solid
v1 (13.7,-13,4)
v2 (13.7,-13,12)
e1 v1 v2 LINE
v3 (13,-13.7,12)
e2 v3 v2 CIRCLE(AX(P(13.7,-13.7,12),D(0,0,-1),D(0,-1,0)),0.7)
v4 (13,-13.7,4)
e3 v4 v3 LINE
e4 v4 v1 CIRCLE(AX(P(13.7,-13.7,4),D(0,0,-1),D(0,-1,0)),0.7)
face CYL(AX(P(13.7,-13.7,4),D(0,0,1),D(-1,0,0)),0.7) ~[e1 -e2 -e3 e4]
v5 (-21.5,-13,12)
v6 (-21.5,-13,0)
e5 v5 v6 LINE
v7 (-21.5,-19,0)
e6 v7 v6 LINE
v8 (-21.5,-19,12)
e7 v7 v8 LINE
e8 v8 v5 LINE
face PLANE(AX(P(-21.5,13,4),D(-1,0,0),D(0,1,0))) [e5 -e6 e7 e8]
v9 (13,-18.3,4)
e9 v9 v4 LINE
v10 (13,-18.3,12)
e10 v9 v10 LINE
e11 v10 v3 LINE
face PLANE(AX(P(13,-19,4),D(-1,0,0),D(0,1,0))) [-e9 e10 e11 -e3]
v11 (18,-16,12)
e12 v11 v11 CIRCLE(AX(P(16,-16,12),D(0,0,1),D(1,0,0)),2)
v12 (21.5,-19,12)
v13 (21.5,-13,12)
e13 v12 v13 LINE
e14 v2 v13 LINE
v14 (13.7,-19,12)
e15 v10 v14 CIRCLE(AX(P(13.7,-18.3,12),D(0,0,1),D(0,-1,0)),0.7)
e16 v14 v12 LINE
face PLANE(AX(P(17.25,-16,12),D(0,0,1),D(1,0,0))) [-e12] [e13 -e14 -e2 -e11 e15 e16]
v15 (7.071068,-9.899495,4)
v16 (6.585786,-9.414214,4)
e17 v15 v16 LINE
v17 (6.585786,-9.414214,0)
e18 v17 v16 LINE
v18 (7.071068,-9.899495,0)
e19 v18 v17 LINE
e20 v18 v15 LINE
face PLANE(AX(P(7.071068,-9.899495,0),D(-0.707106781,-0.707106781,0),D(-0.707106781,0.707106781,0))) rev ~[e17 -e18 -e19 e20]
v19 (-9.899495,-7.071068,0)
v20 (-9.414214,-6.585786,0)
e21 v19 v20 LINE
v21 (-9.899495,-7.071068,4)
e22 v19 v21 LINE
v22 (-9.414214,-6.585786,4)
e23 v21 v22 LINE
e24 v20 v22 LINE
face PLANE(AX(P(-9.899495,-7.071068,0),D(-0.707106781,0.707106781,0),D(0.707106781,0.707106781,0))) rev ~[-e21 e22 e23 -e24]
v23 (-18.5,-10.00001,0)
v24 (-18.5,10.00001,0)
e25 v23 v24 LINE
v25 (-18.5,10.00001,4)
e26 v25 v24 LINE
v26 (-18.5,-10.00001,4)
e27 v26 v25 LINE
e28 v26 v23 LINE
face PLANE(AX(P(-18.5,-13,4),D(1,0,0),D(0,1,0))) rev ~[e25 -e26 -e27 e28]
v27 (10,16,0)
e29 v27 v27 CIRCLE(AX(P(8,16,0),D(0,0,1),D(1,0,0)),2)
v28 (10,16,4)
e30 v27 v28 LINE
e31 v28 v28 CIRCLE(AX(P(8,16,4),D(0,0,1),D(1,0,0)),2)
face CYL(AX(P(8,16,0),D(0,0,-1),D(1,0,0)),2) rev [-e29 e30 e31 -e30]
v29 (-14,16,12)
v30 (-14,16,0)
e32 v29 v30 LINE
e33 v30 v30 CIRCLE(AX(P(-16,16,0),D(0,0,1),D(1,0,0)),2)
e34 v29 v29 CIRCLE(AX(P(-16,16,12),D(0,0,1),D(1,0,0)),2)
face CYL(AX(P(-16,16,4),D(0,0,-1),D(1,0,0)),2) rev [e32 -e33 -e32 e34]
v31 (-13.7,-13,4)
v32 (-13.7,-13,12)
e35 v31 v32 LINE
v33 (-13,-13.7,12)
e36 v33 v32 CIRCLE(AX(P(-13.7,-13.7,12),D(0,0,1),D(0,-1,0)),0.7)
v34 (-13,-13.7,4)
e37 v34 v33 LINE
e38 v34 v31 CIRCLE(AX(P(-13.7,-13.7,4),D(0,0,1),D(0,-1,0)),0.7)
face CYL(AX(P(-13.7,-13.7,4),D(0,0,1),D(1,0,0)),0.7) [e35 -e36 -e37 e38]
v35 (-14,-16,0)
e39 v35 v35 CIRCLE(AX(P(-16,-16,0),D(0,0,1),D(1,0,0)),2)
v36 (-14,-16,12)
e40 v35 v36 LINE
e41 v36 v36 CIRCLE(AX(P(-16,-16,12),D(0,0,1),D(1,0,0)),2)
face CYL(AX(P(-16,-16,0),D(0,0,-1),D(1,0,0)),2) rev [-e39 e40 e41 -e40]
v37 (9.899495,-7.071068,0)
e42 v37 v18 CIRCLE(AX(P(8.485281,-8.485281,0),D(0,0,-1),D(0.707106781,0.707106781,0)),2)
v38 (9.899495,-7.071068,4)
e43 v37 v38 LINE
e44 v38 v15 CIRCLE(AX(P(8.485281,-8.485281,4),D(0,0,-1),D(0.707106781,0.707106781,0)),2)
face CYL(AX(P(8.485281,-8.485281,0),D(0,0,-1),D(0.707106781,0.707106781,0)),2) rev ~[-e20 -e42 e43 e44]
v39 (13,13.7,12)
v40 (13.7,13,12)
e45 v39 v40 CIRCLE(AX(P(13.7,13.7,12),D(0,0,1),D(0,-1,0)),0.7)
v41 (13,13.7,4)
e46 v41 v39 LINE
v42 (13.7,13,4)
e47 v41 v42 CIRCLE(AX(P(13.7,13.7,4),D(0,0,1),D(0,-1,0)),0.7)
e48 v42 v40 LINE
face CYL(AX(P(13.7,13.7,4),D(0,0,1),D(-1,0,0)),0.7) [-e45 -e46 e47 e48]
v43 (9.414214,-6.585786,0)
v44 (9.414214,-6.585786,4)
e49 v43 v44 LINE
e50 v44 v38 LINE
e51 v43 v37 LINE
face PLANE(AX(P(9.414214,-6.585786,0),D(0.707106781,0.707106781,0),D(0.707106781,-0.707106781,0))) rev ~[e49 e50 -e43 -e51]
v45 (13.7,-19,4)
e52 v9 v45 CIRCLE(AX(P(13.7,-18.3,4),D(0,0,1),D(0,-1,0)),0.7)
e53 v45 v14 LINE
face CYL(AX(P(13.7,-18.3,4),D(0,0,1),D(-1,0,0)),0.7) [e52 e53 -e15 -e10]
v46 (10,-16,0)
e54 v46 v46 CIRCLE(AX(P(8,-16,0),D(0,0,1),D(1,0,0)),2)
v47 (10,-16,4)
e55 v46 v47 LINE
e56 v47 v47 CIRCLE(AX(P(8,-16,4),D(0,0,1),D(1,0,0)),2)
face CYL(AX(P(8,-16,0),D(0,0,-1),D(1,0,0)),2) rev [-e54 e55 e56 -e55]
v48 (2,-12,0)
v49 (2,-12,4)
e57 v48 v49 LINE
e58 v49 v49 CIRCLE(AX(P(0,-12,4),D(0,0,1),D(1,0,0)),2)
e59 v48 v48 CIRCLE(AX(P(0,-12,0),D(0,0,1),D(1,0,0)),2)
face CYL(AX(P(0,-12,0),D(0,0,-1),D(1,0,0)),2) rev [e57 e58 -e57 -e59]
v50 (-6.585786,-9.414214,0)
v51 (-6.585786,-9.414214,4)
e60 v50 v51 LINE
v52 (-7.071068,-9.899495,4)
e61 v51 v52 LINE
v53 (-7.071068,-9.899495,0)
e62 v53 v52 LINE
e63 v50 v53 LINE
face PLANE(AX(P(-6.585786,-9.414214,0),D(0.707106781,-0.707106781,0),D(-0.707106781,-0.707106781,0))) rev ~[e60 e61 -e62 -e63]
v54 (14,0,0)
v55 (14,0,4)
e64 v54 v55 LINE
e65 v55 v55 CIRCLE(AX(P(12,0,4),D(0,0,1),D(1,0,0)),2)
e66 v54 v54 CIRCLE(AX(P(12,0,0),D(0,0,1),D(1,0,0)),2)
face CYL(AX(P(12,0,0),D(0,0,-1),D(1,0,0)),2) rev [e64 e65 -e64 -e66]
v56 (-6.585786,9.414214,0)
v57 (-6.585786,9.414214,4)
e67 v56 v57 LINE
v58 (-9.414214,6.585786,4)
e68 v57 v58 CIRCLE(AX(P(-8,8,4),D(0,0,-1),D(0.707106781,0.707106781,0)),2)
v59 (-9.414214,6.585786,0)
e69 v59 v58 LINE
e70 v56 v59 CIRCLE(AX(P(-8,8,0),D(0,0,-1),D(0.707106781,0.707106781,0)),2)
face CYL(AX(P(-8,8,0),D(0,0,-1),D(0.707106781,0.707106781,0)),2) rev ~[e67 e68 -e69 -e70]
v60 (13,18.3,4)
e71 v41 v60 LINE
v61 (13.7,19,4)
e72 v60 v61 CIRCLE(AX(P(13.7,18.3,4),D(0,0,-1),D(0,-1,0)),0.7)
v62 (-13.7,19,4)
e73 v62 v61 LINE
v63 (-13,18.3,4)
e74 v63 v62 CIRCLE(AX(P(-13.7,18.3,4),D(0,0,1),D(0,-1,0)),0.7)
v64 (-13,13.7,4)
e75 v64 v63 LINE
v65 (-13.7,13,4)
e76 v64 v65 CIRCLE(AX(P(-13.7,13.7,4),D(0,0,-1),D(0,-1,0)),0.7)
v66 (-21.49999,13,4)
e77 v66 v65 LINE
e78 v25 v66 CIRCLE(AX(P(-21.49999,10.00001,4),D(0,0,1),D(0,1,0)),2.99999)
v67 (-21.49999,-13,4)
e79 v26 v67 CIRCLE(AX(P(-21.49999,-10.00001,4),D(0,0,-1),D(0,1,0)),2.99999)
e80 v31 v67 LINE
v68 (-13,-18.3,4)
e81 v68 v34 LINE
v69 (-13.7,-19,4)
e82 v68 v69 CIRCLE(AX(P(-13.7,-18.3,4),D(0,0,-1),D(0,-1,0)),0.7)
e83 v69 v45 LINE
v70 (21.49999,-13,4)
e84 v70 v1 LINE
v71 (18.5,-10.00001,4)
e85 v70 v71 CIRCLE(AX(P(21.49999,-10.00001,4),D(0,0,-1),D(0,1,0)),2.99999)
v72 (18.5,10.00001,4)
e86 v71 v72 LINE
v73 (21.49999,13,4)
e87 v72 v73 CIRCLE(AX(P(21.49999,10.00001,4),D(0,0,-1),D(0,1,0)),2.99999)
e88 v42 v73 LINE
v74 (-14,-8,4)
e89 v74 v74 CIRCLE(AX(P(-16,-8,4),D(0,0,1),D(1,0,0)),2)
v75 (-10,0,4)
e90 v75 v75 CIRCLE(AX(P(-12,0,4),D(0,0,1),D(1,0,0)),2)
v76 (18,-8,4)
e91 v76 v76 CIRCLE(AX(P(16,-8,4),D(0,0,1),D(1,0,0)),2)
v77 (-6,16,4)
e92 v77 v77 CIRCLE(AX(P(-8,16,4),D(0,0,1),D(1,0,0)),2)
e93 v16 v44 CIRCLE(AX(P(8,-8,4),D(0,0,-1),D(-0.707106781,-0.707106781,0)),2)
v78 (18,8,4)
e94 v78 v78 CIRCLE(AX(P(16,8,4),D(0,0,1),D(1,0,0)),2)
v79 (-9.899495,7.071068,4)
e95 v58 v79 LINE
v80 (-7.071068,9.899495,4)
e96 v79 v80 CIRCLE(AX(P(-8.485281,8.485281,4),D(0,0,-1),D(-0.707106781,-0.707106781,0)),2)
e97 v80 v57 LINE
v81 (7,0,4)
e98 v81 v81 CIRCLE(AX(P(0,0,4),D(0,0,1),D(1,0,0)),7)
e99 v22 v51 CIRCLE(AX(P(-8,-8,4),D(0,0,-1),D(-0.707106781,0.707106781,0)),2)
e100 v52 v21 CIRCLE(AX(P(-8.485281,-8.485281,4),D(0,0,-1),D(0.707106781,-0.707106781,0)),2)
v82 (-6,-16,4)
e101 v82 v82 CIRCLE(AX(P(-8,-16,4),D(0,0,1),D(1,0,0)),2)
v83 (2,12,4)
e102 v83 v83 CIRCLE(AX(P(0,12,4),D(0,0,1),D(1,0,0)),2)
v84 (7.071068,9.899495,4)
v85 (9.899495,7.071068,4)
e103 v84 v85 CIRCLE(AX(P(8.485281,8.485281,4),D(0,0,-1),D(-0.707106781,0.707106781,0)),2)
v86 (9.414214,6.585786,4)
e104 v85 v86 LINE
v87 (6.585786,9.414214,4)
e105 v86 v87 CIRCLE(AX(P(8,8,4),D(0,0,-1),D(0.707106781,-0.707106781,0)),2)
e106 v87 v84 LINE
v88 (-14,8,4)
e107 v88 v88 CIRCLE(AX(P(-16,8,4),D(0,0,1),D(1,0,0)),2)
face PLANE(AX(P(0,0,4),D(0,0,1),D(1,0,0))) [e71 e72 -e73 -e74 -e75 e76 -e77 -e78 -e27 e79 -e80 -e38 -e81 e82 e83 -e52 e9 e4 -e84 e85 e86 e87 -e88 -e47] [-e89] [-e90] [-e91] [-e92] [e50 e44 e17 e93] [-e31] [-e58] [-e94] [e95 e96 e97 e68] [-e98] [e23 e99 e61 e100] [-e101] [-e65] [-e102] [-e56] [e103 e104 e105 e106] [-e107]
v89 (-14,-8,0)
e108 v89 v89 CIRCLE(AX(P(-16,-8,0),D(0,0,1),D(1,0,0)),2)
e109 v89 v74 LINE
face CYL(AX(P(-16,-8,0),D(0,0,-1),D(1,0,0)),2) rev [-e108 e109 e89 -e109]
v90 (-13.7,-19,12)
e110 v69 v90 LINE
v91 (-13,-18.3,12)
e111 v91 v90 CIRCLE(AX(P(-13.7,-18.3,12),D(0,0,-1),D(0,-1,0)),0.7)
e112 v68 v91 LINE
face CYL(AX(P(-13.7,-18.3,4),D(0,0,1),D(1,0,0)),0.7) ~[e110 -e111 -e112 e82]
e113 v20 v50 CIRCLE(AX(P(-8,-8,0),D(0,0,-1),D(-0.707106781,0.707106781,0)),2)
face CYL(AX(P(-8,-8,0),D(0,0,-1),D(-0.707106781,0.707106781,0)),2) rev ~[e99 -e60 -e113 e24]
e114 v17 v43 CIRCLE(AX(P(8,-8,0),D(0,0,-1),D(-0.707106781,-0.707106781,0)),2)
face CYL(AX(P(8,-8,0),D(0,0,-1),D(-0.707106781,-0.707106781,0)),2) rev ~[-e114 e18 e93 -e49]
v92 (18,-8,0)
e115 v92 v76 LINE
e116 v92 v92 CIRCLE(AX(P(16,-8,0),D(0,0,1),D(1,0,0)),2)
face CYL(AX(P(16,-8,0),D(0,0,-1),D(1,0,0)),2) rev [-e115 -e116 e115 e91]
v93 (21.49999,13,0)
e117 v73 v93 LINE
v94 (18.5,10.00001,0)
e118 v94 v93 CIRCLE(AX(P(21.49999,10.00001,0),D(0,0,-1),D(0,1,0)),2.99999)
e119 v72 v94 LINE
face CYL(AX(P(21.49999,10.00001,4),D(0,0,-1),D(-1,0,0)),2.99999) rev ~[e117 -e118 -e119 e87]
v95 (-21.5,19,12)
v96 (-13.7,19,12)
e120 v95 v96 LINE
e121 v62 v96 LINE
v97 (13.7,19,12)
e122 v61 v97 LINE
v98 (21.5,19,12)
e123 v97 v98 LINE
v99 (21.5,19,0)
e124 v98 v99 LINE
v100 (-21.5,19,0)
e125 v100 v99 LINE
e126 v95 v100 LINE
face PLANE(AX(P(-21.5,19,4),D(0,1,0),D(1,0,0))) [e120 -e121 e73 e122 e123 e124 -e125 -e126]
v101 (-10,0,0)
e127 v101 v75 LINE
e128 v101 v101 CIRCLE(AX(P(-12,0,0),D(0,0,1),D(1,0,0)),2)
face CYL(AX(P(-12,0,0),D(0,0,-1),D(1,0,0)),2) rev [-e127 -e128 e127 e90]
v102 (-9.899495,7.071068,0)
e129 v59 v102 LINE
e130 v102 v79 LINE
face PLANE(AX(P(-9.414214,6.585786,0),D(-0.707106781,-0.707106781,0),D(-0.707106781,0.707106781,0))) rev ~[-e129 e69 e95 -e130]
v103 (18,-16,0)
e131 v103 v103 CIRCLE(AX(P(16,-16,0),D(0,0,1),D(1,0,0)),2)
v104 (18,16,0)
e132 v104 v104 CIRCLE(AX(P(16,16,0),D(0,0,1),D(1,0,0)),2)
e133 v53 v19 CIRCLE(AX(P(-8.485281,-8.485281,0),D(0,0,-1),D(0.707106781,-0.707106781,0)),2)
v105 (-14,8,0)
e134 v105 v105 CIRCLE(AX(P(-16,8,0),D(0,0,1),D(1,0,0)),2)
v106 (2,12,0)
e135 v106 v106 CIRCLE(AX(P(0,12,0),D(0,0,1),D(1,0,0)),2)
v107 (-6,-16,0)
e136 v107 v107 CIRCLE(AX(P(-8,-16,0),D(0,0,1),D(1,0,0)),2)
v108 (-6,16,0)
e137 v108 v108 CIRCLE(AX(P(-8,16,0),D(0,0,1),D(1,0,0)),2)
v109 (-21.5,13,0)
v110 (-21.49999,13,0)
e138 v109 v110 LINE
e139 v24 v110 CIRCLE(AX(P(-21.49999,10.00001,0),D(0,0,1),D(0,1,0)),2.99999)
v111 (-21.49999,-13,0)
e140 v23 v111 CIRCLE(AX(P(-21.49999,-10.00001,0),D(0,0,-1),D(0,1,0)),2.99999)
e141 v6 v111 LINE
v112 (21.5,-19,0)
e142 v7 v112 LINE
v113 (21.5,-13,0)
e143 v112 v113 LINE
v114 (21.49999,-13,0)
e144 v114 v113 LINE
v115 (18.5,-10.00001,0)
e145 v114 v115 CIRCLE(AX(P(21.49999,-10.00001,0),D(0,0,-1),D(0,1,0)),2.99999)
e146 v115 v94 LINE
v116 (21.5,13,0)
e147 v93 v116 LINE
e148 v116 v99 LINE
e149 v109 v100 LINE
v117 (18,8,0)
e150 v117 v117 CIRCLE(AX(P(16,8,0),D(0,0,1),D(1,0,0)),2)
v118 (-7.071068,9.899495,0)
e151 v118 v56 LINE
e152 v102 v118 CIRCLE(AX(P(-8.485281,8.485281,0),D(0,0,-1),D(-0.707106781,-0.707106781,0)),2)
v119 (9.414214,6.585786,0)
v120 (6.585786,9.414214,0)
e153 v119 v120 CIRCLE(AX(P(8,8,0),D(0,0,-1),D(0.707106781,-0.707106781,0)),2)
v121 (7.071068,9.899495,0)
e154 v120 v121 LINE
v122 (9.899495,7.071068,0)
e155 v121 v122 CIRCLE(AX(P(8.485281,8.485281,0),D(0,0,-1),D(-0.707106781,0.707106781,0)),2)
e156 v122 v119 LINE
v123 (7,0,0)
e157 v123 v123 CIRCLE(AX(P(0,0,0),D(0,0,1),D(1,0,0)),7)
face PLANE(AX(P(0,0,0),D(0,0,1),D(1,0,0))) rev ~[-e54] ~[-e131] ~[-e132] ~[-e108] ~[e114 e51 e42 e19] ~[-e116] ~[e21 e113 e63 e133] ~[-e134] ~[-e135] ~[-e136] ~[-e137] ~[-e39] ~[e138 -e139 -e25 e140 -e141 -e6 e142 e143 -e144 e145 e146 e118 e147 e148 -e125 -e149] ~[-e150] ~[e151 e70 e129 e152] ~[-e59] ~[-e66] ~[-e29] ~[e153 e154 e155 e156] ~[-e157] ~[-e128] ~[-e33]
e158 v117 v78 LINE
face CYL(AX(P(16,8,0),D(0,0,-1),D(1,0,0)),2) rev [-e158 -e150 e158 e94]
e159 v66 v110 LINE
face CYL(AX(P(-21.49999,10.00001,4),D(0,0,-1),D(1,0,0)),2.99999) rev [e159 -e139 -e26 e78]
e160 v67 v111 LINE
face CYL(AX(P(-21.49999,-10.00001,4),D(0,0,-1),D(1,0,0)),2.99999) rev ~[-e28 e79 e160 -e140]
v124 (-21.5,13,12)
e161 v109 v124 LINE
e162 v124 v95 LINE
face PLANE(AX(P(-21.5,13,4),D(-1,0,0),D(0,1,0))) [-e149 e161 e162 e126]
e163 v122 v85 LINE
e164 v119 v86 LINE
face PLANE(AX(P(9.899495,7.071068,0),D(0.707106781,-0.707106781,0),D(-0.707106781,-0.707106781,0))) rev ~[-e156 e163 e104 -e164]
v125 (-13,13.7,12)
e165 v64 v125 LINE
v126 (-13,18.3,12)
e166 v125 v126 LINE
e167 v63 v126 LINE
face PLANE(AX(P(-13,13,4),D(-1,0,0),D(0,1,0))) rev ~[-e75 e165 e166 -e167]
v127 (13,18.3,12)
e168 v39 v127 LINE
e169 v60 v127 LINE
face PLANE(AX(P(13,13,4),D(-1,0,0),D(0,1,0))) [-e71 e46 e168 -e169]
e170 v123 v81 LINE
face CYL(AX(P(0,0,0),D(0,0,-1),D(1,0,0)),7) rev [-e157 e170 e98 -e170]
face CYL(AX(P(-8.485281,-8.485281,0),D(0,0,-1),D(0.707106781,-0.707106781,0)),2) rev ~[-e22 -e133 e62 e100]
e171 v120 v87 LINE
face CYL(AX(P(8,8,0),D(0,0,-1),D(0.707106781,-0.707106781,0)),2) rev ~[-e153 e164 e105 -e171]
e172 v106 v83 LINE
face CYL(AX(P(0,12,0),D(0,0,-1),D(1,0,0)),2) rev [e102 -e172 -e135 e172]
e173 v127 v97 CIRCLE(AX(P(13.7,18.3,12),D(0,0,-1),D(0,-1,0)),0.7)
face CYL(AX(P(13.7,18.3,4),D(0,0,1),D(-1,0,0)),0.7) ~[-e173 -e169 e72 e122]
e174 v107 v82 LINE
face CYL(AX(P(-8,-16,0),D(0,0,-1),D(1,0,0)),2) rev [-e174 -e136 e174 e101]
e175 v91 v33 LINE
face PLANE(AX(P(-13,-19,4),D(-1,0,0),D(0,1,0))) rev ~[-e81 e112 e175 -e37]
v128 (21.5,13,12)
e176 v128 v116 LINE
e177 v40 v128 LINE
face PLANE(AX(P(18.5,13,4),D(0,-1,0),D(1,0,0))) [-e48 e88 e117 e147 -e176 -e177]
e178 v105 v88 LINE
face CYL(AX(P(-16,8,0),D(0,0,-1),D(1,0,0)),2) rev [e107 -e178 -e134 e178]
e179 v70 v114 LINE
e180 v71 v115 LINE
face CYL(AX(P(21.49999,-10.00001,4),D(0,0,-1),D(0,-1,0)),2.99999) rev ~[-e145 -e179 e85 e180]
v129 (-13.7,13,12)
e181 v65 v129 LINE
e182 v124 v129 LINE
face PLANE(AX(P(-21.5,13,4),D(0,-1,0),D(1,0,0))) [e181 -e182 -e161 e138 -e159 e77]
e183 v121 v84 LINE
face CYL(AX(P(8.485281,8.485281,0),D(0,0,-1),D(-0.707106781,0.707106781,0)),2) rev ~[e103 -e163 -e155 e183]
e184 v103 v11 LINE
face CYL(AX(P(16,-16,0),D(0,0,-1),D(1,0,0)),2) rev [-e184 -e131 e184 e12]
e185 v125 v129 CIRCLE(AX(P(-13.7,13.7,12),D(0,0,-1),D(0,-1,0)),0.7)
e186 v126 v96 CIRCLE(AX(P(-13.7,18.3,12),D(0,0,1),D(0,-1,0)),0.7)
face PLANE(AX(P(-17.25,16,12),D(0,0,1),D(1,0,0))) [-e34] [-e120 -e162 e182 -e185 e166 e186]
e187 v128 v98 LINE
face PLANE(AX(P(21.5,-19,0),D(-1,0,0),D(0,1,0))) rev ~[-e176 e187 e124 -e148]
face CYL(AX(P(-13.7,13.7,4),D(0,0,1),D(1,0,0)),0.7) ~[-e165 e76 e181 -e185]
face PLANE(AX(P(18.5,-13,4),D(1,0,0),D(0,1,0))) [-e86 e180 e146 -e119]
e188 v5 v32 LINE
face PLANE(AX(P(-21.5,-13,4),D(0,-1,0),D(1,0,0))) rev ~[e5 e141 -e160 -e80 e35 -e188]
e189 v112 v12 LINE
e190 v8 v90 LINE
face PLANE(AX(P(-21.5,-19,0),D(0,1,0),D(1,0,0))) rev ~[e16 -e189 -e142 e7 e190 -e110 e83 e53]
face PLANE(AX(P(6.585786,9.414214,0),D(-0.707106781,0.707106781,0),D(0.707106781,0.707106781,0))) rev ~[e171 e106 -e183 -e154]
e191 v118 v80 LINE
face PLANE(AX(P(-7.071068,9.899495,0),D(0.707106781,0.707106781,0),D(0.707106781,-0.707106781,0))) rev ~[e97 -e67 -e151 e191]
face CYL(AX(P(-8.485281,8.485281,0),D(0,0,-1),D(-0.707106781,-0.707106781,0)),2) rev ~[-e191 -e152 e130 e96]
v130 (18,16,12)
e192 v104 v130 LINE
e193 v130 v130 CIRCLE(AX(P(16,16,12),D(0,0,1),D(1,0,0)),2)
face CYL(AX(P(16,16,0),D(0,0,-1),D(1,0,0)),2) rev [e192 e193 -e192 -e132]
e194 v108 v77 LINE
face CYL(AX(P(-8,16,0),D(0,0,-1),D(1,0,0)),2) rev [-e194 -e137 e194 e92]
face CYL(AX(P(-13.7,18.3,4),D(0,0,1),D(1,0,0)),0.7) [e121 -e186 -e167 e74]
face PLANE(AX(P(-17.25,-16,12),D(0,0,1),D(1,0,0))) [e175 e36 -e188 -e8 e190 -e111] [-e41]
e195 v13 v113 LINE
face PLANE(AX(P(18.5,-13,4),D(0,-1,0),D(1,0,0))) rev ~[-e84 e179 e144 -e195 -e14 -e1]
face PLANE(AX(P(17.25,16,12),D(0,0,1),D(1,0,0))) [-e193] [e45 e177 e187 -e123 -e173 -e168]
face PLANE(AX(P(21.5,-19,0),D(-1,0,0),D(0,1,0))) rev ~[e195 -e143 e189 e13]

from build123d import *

# Parameters (mm, degrees)
F0_W     = 43
F0_H     = 38
F0_R     = 2
F0_R_2   = 7
F1_DEPTH = 4
F2_W     = 8.5
F2_H     = 6
F2_R     = 2
F3_DEPTH = 8
F4_W     = 3
F4_H     = 26
F5_DEPTH = 25
F6_R     = 2.99999
F7_R     = 0.7


# Not quite as in the source:
# - a fillet or chamfer is up to 0.001 mm smaller than in the source, because OpenCascade refuses the exact size


with BuildPart() as f1:
    # F0 (on Top) → F1 (new body)
    with BuildSketch(Plane.XY):
        Rectangle(F0_W, F0_H)
        with Locations((-16, -16)):
            Circle(F0_R, mode=Mode.SUBTRACT)
        with Locations((-8, -16)):
            Circle(F0_R, mode=Mode.SUBTRACT)
        with Locations((-16, -8)):
            Circle(F0_R, mode=Mode.SUBTRACT)
        with BuildLine():
            ThreePointArc((-9.4142135624, -6.5857864376), (-6.5857864376, -6.5857864376), (-6.5857864376, -9.4142135624))
            Line((-6.5857864376, -9.4142135624), (-7.0710678119, -9.8994949366))
            ThreePointArc((-7.0710678119, -9.8994949366), (-9.8994949366, -9.8994949366), (-9.8994949366, -7.0710678119))
            Line((-9.8994949366, -7.0710678119), (-9.4142135624, -6.5857864376))
        make_face(mode=Mode.SUBTRACT)
        with Locations((8, -16)):
            Circle(F0_R, mode=Mode.SUBTRACT)
        with Locations((0, -12)):
            Circle(F0_R, mode=Mode.SUBTRACT)
        with Locations((16, -16)):
            Circle(F0_R, mode=Mode.SUBTRACT)
        with BuildLine():
            ThreePointArc((6.5857864376, -9.4142135624), (6.5857864376, -6.5857864376), (9.4142135624, -6.5857864376))
            Line((9.4142135624, -6.5857864376), (9.8994949366, -7.0710678119))
            ThreePointArc((9.8994949366, -7.0710678119), (9.8994949366, -9.8994949366), (7.0710678119, -9.8994949366))
            Line((7.0710678119, -9.8994949366), (6.5857864376, -9.4142135624))
        make_face(mode=Mode.SUBTRACT)
        with Locations((16, -8)):
            Circle(F0_R, mode=Mode.SUBTRACT)
        with Locations((-12, 0)):
            Circle(F0_R, mode=Mode.SUBTRACT)
        with Locations((-16, 8)):
            Circle(F0_R, mode=Mode.SUBTRACT)
        with BuildLine():
            ThreePointArc((-6.5857864376, 9.4142135624), (-6.5857864376, 6.5857864376), (-9.4142135624, 6.5857864376))
            Line((-9.4142135624, 6.5857864376), (-9.8994949366, 7.0710678119))
            ThreePointArc((-9.8994949366, 7.0710678119), (-9.8994949366, 9.8994949366), (-7.0710678119, 9.8994949366))
            Line((-7.0710678119, 9.8994949366), (-6.5857864376, 9.4142135624))
        make_face(mode=Mode.SUBTRACT)
        with Locations((-16, 16)):
            Circle(F0_R, mode=Mode.SUBTRACT)
        with Locations((-8, 16)):
            Circle(F0_R, mode=Mode.SUBTRACT)
        Circle(F0_R_2, mode=Mode.SUBTRACT)
        with BuildLine():
            ThreePointArc((9.4142135624, 6.5857864376), (6.5857864376, 6.5857864376), (6.5857864376, 9.4142135624))
            Line((6.5857864376, 9.4142135624), (7.0710678119, 9.8994949366))
            ThreePointArc((7.0710678119, 9.8994949366), (9.8994949366, 9.8994949366), (9.8994949366, 7.0710678119))
            Line((9.8994949366, 7.0710678119), (9.4142135624, 6.5857864376))
        make_face(mode=Mode.SUBTRACT)
        with Locations((12, 0)):
            Circle(F0_R, mode=Mode.SUBTRACT)
        with Locations((16, 8)):
            Circle(F0_R, mode=Mode.SUBTRACT)
        with Locations((0, 12)):
            Circle(F0_R, mode=Mode.SUBTRACT)
        with Locations((8, 16)):
            Circle(F0_R, mode=Mode.SUBTRACT)
        with Locations((16, 16)):
            Circle(F0_R, mode=Mode.SUBTRACT)
    extrude(amount=F1_DEPTH)

    # F2 (on face) → F3 (join)
    with BuildSketch(Plane.XY.offset(4)):
        with Locations((-17.25, 16)):
            Rectangle(F2_W, F2_H)
        with Locations((-16, 16)):
            Circle(F2_R, mode=Mode.SUBTRACT)
        with Locations((17.25, 16)):
            Rectangle(F2_W, F2_H)
        with Locations((16, 16)):
            Circle(F2_R, mode=Mode.SUBTRACT)
        with Locations((17.25, -16)):
            Rectangle(F2_W, F2_H)
        with Locations((16, -16)):
            Circle(F2_R, mode=Mode.SUBTRACT)
        with Locations((-17.25, -16)):
            Rectangle(F2_W, F2_H)
        with Locations((-16, -16)):
            Circle(F2_R, mode=Mode.SUBTRACT)
    extrude(amount=F3_DEPTH)

    # F4 (on face) → F5 (cut)
    with BuildSketch(Plane.XY.offset(4)):
        with Locations((-20, 0)):
            Rectangle(F4_W, F4_H)
        with Locations((20, 0)):
            Rectangle(F4_W, F4_H)
    extrude(amount=-F5_DEPTH, mode=Mode.SUBTRACT)

    # F6 (radius 3 in the source; OpenCascade refuses exactly that, so slightly less here)
    f6_edges = [f1.edges().sort_by_distance(p)[0] for p in [
        (-18.5, 13, 2),
        (-18.5, -13, 2),
        (18.5, 13, 2),
        (18.5, -13, 2),
    ]]
    fillet(f6_edges, radius=F6_R)

    # F7
    f7_edges = [f1.edges().sort_by_distance(p)[0] for p in [
        (13, 13, 8),
        (13, -19, 8),
        (13, -13, 8),
        (-13, -19, 8),
        (-13, 13, 8),
        (-13, 19, 8),
        (-13, -13, 8),
        (13, 19, 8),
    ]]
    fillet(f7_edges, radius=F7_R)


solid = f1.part
